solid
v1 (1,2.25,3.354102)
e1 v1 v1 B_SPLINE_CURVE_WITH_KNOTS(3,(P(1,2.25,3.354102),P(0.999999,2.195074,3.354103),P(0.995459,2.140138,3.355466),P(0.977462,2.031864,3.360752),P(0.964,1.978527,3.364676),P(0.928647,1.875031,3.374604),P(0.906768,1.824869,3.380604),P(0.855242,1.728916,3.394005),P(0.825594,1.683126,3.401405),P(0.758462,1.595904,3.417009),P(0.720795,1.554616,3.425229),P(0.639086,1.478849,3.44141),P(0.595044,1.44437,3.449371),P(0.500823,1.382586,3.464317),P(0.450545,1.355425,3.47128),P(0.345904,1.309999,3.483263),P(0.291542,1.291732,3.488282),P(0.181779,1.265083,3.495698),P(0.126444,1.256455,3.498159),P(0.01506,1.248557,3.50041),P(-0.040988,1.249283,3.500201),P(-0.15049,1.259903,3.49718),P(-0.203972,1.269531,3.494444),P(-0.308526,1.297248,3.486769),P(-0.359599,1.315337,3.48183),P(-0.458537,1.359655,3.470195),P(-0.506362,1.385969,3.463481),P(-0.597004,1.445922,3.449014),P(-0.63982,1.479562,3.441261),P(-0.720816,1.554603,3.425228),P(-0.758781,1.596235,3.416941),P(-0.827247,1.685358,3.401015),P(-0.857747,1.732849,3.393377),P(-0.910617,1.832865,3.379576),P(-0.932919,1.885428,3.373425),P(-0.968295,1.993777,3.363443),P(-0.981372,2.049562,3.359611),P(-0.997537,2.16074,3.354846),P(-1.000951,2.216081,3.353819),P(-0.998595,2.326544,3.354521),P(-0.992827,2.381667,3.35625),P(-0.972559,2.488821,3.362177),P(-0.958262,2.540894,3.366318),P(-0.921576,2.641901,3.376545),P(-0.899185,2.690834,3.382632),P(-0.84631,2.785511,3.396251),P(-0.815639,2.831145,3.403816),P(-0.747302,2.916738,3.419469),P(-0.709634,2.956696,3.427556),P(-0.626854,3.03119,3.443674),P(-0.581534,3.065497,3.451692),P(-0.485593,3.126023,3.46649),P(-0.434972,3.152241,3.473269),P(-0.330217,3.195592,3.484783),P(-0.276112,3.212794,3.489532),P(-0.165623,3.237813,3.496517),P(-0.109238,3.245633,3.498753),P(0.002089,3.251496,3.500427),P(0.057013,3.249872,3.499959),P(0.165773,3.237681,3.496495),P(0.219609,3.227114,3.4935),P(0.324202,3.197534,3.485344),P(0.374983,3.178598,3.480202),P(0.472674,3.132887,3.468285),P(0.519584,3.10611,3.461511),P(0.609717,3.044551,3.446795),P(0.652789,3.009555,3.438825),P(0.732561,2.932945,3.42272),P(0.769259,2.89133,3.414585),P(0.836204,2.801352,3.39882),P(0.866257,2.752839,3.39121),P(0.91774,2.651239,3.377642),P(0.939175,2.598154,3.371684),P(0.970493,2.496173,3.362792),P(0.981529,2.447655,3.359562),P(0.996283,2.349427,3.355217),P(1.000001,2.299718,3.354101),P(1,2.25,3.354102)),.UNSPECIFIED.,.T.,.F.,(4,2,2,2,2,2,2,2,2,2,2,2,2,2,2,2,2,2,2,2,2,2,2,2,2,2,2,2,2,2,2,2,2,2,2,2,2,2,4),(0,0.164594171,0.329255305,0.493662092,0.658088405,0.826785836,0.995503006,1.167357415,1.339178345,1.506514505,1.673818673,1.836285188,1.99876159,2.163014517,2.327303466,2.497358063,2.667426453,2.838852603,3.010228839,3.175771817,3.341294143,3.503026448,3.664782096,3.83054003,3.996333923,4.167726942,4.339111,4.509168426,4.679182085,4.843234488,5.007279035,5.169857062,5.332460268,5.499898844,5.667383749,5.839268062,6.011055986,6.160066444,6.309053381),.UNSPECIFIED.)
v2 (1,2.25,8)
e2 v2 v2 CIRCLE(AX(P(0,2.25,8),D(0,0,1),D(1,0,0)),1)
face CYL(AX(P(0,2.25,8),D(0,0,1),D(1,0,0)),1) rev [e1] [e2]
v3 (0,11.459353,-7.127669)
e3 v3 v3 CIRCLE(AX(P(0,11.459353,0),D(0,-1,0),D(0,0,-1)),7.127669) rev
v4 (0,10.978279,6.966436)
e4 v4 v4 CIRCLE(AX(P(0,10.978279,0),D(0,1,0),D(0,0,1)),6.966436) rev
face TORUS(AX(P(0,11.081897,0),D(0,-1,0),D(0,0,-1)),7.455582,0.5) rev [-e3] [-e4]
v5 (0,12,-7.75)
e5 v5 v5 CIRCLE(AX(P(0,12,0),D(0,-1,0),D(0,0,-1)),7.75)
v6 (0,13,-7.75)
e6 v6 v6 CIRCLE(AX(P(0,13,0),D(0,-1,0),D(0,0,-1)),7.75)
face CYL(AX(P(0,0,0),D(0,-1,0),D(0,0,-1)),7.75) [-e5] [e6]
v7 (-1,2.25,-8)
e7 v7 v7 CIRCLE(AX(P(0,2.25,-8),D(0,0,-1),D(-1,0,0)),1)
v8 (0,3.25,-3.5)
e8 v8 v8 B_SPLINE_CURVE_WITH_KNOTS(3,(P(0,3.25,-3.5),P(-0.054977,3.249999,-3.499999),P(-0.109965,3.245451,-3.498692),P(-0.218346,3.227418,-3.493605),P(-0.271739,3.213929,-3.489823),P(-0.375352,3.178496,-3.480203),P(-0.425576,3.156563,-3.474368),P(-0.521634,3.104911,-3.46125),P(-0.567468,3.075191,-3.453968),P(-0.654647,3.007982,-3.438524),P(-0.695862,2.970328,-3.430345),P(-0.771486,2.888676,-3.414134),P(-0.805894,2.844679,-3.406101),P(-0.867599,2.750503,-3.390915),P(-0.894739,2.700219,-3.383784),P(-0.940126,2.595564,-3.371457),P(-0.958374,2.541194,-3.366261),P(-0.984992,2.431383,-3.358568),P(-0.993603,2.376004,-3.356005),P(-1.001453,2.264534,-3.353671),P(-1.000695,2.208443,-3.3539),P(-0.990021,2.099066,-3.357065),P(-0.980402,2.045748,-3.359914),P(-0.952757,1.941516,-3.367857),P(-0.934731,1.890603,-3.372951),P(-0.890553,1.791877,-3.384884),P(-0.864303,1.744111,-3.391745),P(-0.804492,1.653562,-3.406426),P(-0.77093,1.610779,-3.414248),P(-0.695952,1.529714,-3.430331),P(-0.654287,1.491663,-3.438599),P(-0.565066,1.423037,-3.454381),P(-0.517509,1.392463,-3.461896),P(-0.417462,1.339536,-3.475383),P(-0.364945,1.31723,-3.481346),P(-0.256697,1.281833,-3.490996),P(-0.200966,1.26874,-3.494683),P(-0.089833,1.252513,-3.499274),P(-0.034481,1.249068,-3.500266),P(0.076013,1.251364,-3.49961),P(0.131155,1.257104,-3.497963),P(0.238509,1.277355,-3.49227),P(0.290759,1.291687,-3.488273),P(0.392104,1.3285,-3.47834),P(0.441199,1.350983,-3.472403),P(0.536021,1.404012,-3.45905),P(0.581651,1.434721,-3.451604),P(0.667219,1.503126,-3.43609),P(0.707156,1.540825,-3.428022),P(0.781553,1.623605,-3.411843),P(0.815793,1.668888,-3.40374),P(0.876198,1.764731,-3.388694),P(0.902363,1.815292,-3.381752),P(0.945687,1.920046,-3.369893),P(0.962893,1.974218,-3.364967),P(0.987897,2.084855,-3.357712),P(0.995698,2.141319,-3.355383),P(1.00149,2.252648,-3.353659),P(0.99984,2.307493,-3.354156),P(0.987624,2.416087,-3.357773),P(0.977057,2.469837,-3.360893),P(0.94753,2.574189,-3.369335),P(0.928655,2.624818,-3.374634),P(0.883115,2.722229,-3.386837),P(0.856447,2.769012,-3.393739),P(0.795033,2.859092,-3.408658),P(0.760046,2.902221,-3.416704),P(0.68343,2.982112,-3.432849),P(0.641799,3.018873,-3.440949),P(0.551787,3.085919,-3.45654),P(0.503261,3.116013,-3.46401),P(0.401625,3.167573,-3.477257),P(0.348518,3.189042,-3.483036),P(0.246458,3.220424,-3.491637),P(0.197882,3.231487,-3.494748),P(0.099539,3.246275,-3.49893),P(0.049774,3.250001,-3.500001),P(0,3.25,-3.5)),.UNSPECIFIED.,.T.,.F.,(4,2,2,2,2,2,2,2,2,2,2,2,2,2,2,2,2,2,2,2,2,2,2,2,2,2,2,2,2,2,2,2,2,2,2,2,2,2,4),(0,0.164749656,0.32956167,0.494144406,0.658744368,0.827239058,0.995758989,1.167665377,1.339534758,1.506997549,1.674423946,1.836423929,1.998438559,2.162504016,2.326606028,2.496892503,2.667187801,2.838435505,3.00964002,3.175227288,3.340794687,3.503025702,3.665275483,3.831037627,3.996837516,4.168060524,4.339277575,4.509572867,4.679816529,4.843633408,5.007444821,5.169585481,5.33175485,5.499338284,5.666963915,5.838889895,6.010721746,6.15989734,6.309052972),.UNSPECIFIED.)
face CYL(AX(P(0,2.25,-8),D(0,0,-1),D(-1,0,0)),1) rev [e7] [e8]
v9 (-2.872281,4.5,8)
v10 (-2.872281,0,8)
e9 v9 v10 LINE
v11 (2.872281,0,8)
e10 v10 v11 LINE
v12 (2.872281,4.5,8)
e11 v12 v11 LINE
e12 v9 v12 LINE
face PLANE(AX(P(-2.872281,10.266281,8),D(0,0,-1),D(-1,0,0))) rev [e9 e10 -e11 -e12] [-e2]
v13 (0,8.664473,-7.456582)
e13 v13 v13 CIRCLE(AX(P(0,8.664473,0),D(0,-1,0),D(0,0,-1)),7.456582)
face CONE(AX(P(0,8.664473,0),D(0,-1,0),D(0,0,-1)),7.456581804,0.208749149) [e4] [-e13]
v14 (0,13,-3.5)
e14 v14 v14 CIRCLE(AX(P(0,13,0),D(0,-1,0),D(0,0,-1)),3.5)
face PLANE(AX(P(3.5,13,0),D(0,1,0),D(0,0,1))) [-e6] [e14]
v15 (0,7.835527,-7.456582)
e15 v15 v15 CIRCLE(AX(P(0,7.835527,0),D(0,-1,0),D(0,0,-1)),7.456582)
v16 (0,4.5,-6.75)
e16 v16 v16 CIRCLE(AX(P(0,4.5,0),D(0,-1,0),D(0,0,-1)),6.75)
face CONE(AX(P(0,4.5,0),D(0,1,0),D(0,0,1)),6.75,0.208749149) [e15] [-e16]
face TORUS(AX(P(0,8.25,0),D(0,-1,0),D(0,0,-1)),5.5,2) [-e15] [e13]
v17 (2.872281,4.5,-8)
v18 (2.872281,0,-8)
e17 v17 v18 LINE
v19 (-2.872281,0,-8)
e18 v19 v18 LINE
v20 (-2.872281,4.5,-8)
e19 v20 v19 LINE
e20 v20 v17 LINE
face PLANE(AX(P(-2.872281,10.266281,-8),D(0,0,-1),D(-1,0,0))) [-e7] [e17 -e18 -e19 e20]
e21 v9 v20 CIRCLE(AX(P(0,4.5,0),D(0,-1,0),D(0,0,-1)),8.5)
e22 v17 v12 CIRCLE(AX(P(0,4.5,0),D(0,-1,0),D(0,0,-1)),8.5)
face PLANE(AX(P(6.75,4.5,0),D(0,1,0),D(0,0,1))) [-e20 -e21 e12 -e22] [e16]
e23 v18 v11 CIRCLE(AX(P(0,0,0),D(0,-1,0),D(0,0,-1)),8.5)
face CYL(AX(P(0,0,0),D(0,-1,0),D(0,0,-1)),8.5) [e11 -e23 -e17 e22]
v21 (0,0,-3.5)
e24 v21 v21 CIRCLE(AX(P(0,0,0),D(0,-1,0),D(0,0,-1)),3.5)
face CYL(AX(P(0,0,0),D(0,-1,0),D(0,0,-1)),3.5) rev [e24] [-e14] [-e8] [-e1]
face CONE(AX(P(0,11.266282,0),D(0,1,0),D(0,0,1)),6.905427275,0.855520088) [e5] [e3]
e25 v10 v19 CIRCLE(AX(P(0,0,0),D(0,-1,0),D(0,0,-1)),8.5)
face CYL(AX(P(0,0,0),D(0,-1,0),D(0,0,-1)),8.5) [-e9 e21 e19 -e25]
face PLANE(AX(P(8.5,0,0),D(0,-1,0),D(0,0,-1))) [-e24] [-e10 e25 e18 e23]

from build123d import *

# Parameters (mm, degrees)
CUT_EXTRUDE1_DEPTH = 4.5
CHAMFER1_SIZE      = 1
CHAMFER1_SIZE_2    = 0.75
FILLET2_R          = 0.5


with BuildPart() as part:
    # Sketch2 → Revolve1 (revolve)
    with BuildSketch(Plane.XY, mode=Mode.PRIVATE) as revolve1_sk:
        with BuildLine():
            Line((3.5, 0), (3.5, 13))
            Line((3.5, 13), (7.75, 13))
            Line((7.75, 13), (7.75, 12))
            Line((7.75, 12), (6.75, 12))
            Line((6.75, 12), (7.456581804, 8.664472732))
            ThreePointArc((7.456581804, 8.664472732), (7.5, 8.25), (7.456581804, 7.835527268))
            Line((7.456581804, 7.835527268), (6.75, 4.5))
            Line((6.75, 4.5), (8.5, 4.5))
            Line((8.5, 4.5), (8.5, 0))
            Line((8.5, 0), (3.5, 0))
        make_face()
    revolve(revolve1_sk.sketch.rotate(Axis((0, 0, 0), (0, 1, 0)), 90), axis=Axis((0, 0, 0), (0, 1, 0)))

    # Sketch3 → Cut-Extrude1 (cut)
    with BuildSketch(Plane.XZ):
        with BuildLine():
            Line((-2.872281323, 8), (2.872281323, 8))
            ThreePointArc((2.872281323, 8), (0, 8.5), (-2.872281323, 8))
        make_face()
    cut_extrude1 = extrude(amount=-CUT_EXTRUDE1_DEPTH, mode=Mode.SUBTRACT)

    # Sketch5 → Ø2.0mm Dowel Hole1 (revolve, cut)
    with BuildSketch(Plane(origin=(0, 2.25, 8), x_dir=(0, -1, 0), z_dir=(1, 0, 0))):
        Polygon((0, 0), (0, 6.600860619), (1, 6), (1, 0), align=None)
    f_2_0mm_dowel_hole1 = revolve(axis=Axis((0, 2.25, 14.35), (0, 0, -1)), mode=Mode.SUBTRACT)

    # Mirror1: Cut-Extrude1, Ø2.0mm Dowel Hole1 across plane
    add(cut_extrude1.mirror(Plane.XY), mode=Mode.SUBTRACT)
    add(f_2_0mm_dowel_hole1.mirror(Plane.XY), mode=Mode.SUBTRACT)

    # Chamfer1
    # the kernel refuses this chamfer: 1, 0.75 mm, written as the material it adds along each edge
    with BuildSketch(Plane(origin=(0, 12, 0), x_dir=(0, 0, -1), z_dir=(1, 0, 0))) as chamfer1_piece_1:
        Polygon((6.75 + CHAMFER1_SIZE, 0), (6.75 + CHAMFER1_SIZE_2 * 0.20723636606, -CHAMFER1_SIZE_2 * 0.978290901819), (6.75, 0), align=None)
    revolve(axis=Axis((0, 12, 0), (0, 1, 0)))

    # Fillet2
    fillet2_edges = [part.edges().sort_by_distance(p)[0] for p in [
        (0, 11.266281824, 6.905427275),
    ]]
    fillet(fillet2_edges, radius=FILLET2_R)


solid = part.part
